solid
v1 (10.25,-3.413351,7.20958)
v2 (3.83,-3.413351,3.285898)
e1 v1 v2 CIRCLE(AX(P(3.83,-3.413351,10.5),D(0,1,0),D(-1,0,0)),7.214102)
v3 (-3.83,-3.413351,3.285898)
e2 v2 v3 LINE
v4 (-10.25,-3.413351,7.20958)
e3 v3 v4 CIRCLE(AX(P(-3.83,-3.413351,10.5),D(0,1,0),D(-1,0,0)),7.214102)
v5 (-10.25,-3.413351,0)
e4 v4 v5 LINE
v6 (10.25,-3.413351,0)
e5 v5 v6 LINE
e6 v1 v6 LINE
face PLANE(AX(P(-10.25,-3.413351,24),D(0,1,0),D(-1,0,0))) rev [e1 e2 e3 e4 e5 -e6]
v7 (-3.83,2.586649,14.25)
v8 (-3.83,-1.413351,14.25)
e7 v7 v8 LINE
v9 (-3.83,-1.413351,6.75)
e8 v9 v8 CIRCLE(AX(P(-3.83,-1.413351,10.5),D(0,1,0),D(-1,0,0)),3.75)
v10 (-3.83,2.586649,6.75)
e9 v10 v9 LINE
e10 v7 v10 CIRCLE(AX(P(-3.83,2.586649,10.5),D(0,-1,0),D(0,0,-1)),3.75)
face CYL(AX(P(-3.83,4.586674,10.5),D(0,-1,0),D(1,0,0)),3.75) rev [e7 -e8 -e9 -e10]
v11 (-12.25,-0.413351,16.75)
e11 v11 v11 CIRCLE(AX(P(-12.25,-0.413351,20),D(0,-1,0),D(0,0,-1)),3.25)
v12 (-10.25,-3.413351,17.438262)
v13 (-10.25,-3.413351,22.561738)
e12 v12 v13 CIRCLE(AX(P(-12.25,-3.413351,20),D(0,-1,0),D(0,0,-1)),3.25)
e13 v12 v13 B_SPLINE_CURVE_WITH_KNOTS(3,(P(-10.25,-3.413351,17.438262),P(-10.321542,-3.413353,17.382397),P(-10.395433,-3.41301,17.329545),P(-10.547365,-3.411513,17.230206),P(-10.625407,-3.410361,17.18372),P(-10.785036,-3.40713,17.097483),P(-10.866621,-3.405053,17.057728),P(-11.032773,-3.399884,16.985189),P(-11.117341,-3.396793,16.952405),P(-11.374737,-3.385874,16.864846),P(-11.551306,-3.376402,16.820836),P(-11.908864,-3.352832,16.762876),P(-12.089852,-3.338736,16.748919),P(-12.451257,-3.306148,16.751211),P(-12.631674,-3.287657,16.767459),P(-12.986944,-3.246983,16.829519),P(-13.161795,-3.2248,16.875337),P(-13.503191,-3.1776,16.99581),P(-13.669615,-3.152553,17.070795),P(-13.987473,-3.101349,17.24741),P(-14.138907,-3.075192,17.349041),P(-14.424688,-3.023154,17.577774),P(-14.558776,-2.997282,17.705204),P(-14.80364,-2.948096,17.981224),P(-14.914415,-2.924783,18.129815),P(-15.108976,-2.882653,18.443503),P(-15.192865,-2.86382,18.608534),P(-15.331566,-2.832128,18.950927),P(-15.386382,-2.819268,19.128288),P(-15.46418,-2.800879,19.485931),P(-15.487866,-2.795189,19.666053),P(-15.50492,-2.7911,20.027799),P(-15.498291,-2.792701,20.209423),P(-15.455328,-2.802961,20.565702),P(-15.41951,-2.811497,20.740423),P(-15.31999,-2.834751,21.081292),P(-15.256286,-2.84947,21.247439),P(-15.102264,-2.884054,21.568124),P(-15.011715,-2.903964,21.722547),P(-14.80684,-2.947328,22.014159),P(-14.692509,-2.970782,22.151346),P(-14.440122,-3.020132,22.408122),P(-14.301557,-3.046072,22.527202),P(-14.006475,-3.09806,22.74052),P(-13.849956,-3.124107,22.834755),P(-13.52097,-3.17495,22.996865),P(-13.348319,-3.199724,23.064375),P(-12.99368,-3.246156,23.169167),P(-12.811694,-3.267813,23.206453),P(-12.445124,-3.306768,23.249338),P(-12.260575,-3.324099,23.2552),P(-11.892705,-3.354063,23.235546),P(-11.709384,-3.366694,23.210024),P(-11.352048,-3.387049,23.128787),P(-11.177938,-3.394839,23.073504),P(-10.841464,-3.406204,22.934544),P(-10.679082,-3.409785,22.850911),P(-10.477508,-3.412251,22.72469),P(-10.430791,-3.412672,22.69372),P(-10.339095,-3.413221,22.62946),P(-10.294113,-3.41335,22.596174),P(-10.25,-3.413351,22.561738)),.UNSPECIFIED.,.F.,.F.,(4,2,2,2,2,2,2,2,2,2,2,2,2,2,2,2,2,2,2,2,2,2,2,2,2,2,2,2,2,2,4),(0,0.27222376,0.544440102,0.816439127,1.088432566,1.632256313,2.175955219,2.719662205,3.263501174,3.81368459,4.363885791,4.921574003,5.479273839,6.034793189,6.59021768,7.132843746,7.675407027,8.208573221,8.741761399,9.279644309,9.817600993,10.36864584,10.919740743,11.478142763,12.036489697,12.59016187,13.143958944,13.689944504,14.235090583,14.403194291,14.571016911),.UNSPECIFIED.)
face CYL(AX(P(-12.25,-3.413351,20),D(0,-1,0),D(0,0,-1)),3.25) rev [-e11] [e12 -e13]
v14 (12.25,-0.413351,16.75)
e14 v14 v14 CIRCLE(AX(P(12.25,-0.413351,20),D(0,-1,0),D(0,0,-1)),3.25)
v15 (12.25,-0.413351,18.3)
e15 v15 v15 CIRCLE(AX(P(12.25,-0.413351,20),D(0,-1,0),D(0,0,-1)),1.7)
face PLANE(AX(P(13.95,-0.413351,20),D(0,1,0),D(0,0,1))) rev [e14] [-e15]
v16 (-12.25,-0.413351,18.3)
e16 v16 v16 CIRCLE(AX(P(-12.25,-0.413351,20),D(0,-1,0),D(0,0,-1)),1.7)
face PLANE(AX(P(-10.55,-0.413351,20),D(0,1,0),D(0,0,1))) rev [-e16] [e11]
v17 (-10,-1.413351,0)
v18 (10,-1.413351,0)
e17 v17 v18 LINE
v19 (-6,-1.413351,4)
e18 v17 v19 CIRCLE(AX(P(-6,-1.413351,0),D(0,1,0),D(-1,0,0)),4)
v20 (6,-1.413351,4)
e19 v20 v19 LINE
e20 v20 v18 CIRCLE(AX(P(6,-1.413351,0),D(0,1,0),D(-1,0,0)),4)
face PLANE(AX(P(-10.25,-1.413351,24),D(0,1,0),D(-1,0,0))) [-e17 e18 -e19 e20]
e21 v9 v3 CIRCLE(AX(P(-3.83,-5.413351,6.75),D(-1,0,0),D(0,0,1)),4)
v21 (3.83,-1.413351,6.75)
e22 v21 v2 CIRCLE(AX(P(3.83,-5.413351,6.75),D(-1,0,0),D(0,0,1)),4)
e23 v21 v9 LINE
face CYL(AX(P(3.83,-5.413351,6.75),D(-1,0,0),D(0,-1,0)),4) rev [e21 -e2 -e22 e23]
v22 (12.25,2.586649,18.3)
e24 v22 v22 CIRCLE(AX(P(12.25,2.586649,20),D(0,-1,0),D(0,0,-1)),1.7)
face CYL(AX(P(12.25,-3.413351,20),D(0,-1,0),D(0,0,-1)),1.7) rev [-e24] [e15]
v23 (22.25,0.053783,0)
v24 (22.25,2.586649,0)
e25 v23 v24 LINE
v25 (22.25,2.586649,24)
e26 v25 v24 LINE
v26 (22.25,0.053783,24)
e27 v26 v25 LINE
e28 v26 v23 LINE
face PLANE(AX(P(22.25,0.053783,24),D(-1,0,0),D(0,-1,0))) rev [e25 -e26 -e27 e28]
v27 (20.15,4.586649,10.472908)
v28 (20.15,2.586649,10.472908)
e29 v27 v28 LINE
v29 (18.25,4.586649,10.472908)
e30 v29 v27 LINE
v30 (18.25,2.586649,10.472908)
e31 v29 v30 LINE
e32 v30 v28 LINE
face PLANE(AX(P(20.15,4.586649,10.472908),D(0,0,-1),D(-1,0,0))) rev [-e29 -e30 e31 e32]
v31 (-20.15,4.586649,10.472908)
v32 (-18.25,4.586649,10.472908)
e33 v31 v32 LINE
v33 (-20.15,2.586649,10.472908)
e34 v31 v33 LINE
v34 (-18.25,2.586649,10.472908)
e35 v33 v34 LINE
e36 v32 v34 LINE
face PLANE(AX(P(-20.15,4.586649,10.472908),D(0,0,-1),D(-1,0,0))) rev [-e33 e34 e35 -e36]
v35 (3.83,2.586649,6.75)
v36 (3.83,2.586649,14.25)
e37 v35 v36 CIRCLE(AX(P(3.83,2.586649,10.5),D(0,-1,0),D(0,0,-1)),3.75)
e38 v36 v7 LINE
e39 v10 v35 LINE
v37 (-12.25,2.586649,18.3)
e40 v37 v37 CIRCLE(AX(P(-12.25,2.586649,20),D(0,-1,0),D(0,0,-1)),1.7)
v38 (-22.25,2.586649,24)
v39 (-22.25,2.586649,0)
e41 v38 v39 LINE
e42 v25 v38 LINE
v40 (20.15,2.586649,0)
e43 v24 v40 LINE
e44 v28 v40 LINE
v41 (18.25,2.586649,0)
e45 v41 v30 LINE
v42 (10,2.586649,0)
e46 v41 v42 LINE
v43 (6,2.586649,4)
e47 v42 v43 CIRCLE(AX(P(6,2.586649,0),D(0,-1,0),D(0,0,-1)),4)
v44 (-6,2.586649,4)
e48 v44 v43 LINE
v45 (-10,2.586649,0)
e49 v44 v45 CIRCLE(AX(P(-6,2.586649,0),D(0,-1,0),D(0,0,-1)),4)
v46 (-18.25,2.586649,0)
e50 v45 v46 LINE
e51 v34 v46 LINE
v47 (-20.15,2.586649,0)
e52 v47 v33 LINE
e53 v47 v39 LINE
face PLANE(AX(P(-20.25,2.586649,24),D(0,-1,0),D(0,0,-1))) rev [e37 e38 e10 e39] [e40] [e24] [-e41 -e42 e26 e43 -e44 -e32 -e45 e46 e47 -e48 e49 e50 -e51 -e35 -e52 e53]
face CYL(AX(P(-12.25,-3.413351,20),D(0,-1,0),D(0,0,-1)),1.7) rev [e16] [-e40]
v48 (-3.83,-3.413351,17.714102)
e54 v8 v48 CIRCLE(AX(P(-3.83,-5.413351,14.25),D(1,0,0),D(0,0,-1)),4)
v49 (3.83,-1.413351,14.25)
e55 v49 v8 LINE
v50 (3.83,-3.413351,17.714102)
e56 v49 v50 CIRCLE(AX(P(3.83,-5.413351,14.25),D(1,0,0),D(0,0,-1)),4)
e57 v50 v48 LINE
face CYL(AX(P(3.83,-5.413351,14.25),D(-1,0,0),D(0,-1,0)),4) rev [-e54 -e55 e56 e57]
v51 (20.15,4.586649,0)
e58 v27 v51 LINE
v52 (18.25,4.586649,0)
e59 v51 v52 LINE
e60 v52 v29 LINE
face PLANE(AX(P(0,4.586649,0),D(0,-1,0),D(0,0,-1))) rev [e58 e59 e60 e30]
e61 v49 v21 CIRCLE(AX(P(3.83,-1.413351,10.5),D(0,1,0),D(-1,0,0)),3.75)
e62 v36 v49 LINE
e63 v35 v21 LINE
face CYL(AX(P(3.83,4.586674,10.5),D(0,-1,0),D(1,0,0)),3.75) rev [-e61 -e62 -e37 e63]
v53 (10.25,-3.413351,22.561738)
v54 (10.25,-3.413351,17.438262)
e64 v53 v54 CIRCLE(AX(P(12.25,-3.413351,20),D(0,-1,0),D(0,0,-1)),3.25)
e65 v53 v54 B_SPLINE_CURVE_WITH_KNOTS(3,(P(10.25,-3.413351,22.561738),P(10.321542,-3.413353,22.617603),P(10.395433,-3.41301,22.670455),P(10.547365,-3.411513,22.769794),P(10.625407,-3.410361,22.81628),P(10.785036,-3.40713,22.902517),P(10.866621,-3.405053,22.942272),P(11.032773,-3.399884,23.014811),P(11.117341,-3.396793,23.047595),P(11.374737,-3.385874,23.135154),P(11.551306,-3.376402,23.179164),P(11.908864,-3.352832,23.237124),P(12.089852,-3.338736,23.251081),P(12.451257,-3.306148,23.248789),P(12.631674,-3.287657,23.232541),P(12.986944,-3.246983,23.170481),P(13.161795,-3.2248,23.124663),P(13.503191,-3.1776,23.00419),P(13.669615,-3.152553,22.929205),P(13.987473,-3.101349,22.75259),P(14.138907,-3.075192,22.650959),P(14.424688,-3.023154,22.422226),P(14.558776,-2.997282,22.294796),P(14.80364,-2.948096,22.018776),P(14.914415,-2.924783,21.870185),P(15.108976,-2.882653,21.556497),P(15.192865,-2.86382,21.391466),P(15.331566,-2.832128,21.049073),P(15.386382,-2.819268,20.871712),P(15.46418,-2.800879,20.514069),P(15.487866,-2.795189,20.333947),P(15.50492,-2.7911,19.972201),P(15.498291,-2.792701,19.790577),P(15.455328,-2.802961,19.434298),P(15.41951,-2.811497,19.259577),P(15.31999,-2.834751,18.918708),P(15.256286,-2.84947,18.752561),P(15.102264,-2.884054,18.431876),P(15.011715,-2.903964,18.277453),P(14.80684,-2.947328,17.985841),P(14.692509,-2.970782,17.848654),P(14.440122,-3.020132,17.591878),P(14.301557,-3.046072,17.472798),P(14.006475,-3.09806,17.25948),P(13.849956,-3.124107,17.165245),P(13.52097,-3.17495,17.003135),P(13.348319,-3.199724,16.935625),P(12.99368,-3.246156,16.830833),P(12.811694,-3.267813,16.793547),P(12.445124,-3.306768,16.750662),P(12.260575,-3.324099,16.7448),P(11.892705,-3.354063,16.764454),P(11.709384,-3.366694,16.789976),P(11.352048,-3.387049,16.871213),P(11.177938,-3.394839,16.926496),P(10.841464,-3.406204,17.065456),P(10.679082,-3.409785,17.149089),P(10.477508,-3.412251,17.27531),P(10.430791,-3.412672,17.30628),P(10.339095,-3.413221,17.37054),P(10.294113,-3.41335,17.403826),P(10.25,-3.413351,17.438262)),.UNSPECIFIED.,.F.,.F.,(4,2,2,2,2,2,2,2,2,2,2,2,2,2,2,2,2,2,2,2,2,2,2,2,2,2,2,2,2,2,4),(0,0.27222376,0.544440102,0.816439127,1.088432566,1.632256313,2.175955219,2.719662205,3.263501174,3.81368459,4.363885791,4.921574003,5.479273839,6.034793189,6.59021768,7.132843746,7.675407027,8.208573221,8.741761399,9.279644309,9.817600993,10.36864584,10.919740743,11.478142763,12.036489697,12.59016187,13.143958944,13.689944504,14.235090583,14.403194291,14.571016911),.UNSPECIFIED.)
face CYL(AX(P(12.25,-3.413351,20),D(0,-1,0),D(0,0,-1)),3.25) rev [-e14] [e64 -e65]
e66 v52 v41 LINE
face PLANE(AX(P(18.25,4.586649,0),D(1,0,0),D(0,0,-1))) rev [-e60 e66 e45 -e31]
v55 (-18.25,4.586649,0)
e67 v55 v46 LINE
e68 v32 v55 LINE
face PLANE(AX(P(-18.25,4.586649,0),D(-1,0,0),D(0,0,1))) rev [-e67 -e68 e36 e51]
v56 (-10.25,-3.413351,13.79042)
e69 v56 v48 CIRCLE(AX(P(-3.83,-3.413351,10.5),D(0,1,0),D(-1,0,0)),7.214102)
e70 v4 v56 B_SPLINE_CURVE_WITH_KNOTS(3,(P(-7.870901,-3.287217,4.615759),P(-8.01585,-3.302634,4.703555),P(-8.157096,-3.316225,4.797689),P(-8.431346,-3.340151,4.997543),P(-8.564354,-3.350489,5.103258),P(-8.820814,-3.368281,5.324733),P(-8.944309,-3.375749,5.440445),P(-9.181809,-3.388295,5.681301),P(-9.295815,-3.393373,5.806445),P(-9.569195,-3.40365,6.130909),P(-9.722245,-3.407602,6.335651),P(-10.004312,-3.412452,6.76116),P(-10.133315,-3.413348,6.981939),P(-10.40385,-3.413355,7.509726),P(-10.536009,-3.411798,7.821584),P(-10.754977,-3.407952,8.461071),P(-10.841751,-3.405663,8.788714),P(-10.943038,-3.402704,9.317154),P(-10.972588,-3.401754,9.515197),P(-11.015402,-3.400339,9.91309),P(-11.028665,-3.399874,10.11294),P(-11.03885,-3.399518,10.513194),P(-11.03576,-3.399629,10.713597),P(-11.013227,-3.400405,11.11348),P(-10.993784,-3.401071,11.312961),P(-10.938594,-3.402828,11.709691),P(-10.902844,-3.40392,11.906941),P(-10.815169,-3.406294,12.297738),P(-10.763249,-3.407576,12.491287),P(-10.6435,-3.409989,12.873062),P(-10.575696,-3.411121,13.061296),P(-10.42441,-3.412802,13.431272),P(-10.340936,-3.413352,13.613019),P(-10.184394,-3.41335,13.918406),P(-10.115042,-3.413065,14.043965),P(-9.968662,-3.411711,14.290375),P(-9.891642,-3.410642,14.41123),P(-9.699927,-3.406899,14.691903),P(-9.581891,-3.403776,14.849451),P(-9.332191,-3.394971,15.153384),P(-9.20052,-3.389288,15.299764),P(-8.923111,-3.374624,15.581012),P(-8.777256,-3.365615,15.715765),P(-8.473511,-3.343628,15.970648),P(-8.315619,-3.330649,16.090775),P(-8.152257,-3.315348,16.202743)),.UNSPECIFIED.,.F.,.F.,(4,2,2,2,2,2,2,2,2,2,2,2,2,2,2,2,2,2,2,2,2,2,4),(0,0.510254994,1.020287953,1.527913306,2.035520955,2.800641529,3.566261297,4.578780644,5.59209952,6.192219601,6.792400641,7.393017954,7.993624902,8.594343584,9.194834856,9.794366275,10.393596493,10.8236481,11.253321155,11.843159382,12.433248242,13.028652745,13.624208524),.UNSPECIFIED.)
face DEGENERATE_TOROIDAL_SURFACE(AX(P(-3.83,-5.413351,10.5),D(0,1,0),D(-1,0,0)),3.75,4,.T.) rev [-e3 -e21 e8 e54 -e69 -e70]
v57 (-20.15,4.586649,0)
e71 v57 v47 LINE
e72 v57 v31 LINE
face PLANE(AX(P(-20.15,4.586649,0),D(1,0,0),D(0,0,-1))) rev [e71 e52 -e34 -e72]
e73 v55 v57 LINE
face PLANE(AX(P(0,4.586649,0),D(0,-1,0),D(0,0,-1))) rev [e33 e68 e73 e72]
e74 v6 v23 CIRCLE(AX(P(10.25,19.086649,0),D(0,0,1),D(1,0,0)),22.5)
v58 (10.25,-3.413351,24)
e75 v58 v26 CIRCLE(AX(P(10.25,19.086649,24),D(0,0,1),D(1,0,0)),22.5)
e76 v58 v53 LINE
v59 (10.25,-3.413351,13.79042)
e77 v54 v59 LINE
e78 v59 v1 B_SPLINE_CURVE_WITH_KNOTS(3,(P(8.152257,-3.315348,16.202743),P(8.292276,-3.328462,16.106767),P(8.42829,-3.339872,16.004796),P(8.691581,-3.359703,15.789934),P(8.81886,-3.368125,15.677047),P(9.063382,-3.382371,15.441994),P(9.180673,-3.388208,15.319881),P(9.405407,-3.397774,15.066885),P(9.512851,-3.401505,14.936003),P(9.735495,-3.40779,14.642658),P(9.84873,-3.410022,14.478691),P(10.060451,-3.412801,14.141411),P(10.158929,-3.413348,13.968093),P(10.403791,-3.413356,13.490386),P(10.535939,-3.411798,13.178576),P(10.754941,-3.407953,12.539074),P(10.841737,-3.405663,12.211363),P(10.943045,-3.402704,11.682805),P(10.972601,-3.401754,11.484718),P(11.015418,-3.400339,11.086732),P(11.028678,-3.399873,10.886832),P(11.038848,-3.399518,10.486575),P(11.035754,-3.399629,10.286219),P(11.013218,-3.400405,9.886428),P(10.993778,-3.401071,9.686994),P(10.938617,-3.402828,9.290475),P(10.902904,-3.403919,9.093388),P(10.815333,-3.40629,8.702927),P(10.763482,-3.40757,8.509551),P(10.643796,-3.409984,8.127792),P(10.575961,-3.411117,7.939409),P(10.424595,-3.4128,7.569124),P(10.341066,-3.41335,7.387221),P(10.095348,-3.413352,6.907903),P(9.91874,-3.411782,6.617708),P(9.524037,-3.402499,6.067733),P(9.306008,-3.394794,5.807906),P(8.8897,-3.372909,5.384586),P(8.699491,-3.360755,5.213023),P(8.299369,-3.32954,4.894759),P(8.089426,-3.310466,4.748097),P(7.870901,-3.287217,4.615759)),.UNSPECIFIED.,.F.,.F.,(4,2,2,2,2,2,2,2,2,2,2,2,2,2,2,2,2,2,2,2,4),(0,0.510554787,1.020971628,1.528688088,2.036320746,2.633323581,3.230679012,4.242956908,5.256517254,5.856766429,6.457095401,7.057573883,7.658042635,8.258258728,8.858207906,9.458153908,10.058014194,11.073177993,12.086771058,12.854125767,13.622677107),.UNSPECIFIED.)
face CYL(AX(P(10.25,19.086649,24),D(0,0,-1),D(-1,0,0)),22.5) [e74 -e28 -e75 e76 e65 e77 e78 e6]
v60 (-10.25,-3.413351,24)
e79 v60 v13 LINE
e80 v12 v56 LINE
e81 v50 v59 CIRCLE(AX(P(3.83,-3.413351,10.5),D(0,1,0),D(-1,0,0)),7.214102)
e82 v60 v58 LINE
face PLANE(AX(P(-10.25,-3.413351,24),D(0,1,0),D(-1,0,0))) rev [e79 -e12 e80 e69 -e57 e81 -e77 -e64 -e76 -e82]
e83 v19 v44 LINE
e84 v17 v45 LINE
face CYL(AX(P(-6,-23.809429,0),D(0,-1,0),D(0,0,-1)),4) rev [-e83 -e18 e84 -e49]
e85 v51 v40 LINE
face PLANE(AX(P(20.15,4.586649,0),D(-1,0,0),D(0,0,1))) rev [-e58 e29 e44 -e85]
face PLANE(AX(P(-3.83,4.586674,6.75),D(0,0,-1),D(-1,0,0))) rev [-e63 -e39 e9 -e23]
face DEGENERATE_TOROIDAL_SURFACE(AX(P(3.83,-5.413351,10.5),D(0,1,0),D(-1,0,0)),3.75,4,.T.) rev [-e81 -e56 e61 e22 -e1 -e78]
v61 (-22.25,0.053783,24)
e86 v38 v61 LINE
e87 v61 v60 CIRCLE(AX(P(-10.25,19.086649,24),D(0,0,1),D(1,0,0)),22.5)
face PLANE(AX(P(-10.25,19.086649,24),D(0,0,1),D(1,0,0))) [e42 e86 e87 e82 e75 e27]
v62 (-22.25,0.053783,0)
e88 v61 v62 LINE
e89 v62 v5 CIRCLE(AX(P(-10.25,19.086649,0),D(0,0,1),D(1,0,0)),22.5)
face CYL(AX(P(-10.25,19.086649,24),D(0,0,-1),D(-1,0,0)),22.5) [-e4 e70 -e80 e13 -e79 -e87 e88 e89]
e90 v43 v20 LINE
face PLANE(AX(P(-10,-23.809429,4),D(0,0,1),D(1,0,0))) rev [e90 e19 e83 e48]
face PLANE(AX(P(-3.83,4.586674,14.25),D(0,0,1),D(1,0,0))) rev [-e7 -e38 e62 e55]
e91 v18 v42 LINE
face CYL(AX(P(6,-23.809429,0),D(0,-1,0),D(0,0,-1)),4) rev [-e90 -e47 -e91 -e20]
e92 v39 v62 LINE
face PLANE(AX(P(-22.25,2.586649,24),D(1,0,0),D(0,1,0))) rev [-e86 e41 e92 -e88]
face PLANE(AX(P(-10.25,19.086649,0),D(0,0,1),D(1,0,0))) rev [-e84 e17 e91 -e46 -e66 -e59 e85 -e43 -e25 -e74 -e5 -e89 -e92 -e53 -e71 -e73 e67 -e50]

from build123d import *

# Parameters (mm, degrees)
EXTRUDE_1_DEPTH             = 24
SKETCH_2_W                  = 20
SKETCH_2_H                  = 4
CUT_EXTRUDE_1_DEPTH         = 4
SKETCH_3_W                  = 1.9
SKETCH_3_H                  = 10.472908188
EXTRUDE_2_DEPTH             = 2
FILLET_1_R                  = 4
CUT_EXTRUDE_2_DEPTH         = 34.690688625
SWEEP_START                 = -3.83
SWEEP_4_3_DEPTH             = 7.66
HOLE_WIZARD_M31_D           = 3.4
HOLE_WIZARD_M31_CBORE_D     = 6.5
HOLE_WIZARD_M31_CBORE_DEPTH = 3


with BuildPart() as part:
    # Эскиз1 → Бобышка-Вытянуть1 (new body)
    with BuildSketch(Plane.XY):
        with BuildLine():
            Line((-20.25, 2.586649223), (20.25, 2.586649223))
            Line((20.25, 2.586649223), (22.25, 2.586649223))
            Line((22.25, 2.586649223), (22.25, 0.053782912))
            ThreePointArc((22.25, 0.053782912), (16.495418641, -2.529195567), (10.25, -3.413350777))
            Line((10.25, -3.413350777), (-10.25, -3.413350777))
            ThreePointArc((-10.25, -3.413350777), (-16.495418641, -2.529195567), (-22.25, 0.053782912))
            Line((-22.25, 0.053782912), (-22.25, 2.586649223))
            Line((-22.25, 2.586649223), (-20.25, 2.586649223))
        make_face()
    extrude(amount=EXTRUDE_1_DEPTH)

    # Эскиз2 → Вырез-Вытянуть1 (cut)
    with BuildSketch(Plane(origin=(0, 2.586649223, 0), x_dir=(1, 0, 0), z_dir=(0, 1, 0))):
        with Locations((0, -2)):
            Rectangle(SKETCH_2_W, SKETCH_2_H)
    extrude(amount=-CUT_EXTRUDE_1_DEPTH, mode=Mode.SUBTRACT)

    # Эскиз3 → Бобышка-Вытянуть2 (add)
    with BuildSketch(Plane(origin=(0, 2.586649223, 0), x_dir=(1, 0, 0), z_dir=(0, 1, 0))):
        with Locations((19.2, -5.236454094)):
            Rectangle(SKETCH_3_W, SKETCH_3_H)
        with Locations((-19.2, -5.236454094)):
            Rectangle(SKETCH_3_W, SKETCH_3_H)
    extrude(amount=EXTRUDE_2_DEPTH)

    # Скругление1
    fillet_1_edges = [part.edges().sort_by_distance(p)[0] for p in [
        (-10, 0.586649223, 4),
        (10, 0.586649223, 4),
    ]]
    fillet(fillet_1_edges, radius=FILLET_1_R - 0.0001)  # a hair under: the kernel refuses the full size

    # Эскиз4 → Вырез-Вытянуть2 (cut, through all)
    with BuildSketch(Plane.XZ.offset(3.413350777)):
        with BuildLine():
            Line((-3.83, 14.25), (3.83, 14.25))
            ThreePointArc((3.83, 14.25), (7.58, 10.5), (3.83, 6.75))
            Line((3.83, 6.75), (-3.83, 6.75))
            ThreePointArc((-3.83, 6.75), (-7.58, 10.5), (-3.83, 14.25))
        make_face()
    extrude(amount=-CUT_EXTRUDE_2_DEPTH, mode=Mode.SUBTRACT)

    # Вырез-По траектории4: read off the stored shape, not the designer's step
    # Вырез-По траектории4 outline → Вырез-По траектории4 (revolve, cut)
    with BuildSketch(Plane(origin=(3.83, 0, 10.5), x_dir=(1, 0, 0), z_dir=(0, 0, 1))):
        with BuildLine():
            Line((3.75, -3.413351016), (7.214101753, -3.413351016))
            ThreePointArc((7.214101753, -3.413351016), (5.750000119, -1.949249231), (3.75, -1.413350777))
            Line((3.75, -1.413350777), (3.75, -3.413351016))
        make_face()
    revolve(axis=Axis((3.83, 0, 10.5), (0, 1, 0)), mode=Mode.SUBTRACT)

    # Sweep 4 2 outline → Sweep 4 2 (revolve, cut)
    with BuildSketch(Plane(origin=(-3.83, 0, 10.5), x_dir=(1, 0, 0), z_dir=(0, 0, 1))):
        with BuildLine():
            Line((3.75, -3.413350777), (7.214101615, -3.413350777))
            ThreePointArc((7.214101615, -3.413350777), (5.75, -1.949249162), (3.75, -1.413350777))
            Line((3.75, -1.413350777), (3.75, -3.413350777))
        make_face()
    revolve(axis=Axis((-3.83, 0, 10.5), (0, 1, 0)), mode=Mode.SUBTRACT)

    # Sweep 4 3 outline → Sweep 4 3 (cut)
    with BuildSketch(Plane.YZ.offset(SWEEP_START)):
        with BuildLine():
            ThreePointArc((-1.413350777, 14.25), (-1.949249162, 16.25), (-3.413350777, 17.714101615))
            Line((-3.413350777, 17.714101615), (-3.413350777, 3.285898385))
            ThreePointArc((-3.413350777, 3.285898385), (-1.949249162, 4.75), (-1.413350777, 6.75))
            Line((-1.413350777, 6.75), (-1.413350777, 14.25))
        make_face()
    extrude(amount=SWEEP_4_3_DEPTH, mode=Mode.SUBTRACT)

    # Цековка для винта с внутренним шестигранником M31 (through all)
    with Locations(Plane(origin=(-12.25, -3.413350777, 20), x_dir=(-1, 0, 0), z_dir=(0, -1, 0))):
        with Locations((0, 0), (-24.5, 0)):
            CounterBoreHole(HOLE_WIZARD_M31_D / 2, HOLE_WIZARD_M31_CBORE_D / 2, HOLE_WIZARD_M31_CBORE_DEPTH)


solid = part.part
